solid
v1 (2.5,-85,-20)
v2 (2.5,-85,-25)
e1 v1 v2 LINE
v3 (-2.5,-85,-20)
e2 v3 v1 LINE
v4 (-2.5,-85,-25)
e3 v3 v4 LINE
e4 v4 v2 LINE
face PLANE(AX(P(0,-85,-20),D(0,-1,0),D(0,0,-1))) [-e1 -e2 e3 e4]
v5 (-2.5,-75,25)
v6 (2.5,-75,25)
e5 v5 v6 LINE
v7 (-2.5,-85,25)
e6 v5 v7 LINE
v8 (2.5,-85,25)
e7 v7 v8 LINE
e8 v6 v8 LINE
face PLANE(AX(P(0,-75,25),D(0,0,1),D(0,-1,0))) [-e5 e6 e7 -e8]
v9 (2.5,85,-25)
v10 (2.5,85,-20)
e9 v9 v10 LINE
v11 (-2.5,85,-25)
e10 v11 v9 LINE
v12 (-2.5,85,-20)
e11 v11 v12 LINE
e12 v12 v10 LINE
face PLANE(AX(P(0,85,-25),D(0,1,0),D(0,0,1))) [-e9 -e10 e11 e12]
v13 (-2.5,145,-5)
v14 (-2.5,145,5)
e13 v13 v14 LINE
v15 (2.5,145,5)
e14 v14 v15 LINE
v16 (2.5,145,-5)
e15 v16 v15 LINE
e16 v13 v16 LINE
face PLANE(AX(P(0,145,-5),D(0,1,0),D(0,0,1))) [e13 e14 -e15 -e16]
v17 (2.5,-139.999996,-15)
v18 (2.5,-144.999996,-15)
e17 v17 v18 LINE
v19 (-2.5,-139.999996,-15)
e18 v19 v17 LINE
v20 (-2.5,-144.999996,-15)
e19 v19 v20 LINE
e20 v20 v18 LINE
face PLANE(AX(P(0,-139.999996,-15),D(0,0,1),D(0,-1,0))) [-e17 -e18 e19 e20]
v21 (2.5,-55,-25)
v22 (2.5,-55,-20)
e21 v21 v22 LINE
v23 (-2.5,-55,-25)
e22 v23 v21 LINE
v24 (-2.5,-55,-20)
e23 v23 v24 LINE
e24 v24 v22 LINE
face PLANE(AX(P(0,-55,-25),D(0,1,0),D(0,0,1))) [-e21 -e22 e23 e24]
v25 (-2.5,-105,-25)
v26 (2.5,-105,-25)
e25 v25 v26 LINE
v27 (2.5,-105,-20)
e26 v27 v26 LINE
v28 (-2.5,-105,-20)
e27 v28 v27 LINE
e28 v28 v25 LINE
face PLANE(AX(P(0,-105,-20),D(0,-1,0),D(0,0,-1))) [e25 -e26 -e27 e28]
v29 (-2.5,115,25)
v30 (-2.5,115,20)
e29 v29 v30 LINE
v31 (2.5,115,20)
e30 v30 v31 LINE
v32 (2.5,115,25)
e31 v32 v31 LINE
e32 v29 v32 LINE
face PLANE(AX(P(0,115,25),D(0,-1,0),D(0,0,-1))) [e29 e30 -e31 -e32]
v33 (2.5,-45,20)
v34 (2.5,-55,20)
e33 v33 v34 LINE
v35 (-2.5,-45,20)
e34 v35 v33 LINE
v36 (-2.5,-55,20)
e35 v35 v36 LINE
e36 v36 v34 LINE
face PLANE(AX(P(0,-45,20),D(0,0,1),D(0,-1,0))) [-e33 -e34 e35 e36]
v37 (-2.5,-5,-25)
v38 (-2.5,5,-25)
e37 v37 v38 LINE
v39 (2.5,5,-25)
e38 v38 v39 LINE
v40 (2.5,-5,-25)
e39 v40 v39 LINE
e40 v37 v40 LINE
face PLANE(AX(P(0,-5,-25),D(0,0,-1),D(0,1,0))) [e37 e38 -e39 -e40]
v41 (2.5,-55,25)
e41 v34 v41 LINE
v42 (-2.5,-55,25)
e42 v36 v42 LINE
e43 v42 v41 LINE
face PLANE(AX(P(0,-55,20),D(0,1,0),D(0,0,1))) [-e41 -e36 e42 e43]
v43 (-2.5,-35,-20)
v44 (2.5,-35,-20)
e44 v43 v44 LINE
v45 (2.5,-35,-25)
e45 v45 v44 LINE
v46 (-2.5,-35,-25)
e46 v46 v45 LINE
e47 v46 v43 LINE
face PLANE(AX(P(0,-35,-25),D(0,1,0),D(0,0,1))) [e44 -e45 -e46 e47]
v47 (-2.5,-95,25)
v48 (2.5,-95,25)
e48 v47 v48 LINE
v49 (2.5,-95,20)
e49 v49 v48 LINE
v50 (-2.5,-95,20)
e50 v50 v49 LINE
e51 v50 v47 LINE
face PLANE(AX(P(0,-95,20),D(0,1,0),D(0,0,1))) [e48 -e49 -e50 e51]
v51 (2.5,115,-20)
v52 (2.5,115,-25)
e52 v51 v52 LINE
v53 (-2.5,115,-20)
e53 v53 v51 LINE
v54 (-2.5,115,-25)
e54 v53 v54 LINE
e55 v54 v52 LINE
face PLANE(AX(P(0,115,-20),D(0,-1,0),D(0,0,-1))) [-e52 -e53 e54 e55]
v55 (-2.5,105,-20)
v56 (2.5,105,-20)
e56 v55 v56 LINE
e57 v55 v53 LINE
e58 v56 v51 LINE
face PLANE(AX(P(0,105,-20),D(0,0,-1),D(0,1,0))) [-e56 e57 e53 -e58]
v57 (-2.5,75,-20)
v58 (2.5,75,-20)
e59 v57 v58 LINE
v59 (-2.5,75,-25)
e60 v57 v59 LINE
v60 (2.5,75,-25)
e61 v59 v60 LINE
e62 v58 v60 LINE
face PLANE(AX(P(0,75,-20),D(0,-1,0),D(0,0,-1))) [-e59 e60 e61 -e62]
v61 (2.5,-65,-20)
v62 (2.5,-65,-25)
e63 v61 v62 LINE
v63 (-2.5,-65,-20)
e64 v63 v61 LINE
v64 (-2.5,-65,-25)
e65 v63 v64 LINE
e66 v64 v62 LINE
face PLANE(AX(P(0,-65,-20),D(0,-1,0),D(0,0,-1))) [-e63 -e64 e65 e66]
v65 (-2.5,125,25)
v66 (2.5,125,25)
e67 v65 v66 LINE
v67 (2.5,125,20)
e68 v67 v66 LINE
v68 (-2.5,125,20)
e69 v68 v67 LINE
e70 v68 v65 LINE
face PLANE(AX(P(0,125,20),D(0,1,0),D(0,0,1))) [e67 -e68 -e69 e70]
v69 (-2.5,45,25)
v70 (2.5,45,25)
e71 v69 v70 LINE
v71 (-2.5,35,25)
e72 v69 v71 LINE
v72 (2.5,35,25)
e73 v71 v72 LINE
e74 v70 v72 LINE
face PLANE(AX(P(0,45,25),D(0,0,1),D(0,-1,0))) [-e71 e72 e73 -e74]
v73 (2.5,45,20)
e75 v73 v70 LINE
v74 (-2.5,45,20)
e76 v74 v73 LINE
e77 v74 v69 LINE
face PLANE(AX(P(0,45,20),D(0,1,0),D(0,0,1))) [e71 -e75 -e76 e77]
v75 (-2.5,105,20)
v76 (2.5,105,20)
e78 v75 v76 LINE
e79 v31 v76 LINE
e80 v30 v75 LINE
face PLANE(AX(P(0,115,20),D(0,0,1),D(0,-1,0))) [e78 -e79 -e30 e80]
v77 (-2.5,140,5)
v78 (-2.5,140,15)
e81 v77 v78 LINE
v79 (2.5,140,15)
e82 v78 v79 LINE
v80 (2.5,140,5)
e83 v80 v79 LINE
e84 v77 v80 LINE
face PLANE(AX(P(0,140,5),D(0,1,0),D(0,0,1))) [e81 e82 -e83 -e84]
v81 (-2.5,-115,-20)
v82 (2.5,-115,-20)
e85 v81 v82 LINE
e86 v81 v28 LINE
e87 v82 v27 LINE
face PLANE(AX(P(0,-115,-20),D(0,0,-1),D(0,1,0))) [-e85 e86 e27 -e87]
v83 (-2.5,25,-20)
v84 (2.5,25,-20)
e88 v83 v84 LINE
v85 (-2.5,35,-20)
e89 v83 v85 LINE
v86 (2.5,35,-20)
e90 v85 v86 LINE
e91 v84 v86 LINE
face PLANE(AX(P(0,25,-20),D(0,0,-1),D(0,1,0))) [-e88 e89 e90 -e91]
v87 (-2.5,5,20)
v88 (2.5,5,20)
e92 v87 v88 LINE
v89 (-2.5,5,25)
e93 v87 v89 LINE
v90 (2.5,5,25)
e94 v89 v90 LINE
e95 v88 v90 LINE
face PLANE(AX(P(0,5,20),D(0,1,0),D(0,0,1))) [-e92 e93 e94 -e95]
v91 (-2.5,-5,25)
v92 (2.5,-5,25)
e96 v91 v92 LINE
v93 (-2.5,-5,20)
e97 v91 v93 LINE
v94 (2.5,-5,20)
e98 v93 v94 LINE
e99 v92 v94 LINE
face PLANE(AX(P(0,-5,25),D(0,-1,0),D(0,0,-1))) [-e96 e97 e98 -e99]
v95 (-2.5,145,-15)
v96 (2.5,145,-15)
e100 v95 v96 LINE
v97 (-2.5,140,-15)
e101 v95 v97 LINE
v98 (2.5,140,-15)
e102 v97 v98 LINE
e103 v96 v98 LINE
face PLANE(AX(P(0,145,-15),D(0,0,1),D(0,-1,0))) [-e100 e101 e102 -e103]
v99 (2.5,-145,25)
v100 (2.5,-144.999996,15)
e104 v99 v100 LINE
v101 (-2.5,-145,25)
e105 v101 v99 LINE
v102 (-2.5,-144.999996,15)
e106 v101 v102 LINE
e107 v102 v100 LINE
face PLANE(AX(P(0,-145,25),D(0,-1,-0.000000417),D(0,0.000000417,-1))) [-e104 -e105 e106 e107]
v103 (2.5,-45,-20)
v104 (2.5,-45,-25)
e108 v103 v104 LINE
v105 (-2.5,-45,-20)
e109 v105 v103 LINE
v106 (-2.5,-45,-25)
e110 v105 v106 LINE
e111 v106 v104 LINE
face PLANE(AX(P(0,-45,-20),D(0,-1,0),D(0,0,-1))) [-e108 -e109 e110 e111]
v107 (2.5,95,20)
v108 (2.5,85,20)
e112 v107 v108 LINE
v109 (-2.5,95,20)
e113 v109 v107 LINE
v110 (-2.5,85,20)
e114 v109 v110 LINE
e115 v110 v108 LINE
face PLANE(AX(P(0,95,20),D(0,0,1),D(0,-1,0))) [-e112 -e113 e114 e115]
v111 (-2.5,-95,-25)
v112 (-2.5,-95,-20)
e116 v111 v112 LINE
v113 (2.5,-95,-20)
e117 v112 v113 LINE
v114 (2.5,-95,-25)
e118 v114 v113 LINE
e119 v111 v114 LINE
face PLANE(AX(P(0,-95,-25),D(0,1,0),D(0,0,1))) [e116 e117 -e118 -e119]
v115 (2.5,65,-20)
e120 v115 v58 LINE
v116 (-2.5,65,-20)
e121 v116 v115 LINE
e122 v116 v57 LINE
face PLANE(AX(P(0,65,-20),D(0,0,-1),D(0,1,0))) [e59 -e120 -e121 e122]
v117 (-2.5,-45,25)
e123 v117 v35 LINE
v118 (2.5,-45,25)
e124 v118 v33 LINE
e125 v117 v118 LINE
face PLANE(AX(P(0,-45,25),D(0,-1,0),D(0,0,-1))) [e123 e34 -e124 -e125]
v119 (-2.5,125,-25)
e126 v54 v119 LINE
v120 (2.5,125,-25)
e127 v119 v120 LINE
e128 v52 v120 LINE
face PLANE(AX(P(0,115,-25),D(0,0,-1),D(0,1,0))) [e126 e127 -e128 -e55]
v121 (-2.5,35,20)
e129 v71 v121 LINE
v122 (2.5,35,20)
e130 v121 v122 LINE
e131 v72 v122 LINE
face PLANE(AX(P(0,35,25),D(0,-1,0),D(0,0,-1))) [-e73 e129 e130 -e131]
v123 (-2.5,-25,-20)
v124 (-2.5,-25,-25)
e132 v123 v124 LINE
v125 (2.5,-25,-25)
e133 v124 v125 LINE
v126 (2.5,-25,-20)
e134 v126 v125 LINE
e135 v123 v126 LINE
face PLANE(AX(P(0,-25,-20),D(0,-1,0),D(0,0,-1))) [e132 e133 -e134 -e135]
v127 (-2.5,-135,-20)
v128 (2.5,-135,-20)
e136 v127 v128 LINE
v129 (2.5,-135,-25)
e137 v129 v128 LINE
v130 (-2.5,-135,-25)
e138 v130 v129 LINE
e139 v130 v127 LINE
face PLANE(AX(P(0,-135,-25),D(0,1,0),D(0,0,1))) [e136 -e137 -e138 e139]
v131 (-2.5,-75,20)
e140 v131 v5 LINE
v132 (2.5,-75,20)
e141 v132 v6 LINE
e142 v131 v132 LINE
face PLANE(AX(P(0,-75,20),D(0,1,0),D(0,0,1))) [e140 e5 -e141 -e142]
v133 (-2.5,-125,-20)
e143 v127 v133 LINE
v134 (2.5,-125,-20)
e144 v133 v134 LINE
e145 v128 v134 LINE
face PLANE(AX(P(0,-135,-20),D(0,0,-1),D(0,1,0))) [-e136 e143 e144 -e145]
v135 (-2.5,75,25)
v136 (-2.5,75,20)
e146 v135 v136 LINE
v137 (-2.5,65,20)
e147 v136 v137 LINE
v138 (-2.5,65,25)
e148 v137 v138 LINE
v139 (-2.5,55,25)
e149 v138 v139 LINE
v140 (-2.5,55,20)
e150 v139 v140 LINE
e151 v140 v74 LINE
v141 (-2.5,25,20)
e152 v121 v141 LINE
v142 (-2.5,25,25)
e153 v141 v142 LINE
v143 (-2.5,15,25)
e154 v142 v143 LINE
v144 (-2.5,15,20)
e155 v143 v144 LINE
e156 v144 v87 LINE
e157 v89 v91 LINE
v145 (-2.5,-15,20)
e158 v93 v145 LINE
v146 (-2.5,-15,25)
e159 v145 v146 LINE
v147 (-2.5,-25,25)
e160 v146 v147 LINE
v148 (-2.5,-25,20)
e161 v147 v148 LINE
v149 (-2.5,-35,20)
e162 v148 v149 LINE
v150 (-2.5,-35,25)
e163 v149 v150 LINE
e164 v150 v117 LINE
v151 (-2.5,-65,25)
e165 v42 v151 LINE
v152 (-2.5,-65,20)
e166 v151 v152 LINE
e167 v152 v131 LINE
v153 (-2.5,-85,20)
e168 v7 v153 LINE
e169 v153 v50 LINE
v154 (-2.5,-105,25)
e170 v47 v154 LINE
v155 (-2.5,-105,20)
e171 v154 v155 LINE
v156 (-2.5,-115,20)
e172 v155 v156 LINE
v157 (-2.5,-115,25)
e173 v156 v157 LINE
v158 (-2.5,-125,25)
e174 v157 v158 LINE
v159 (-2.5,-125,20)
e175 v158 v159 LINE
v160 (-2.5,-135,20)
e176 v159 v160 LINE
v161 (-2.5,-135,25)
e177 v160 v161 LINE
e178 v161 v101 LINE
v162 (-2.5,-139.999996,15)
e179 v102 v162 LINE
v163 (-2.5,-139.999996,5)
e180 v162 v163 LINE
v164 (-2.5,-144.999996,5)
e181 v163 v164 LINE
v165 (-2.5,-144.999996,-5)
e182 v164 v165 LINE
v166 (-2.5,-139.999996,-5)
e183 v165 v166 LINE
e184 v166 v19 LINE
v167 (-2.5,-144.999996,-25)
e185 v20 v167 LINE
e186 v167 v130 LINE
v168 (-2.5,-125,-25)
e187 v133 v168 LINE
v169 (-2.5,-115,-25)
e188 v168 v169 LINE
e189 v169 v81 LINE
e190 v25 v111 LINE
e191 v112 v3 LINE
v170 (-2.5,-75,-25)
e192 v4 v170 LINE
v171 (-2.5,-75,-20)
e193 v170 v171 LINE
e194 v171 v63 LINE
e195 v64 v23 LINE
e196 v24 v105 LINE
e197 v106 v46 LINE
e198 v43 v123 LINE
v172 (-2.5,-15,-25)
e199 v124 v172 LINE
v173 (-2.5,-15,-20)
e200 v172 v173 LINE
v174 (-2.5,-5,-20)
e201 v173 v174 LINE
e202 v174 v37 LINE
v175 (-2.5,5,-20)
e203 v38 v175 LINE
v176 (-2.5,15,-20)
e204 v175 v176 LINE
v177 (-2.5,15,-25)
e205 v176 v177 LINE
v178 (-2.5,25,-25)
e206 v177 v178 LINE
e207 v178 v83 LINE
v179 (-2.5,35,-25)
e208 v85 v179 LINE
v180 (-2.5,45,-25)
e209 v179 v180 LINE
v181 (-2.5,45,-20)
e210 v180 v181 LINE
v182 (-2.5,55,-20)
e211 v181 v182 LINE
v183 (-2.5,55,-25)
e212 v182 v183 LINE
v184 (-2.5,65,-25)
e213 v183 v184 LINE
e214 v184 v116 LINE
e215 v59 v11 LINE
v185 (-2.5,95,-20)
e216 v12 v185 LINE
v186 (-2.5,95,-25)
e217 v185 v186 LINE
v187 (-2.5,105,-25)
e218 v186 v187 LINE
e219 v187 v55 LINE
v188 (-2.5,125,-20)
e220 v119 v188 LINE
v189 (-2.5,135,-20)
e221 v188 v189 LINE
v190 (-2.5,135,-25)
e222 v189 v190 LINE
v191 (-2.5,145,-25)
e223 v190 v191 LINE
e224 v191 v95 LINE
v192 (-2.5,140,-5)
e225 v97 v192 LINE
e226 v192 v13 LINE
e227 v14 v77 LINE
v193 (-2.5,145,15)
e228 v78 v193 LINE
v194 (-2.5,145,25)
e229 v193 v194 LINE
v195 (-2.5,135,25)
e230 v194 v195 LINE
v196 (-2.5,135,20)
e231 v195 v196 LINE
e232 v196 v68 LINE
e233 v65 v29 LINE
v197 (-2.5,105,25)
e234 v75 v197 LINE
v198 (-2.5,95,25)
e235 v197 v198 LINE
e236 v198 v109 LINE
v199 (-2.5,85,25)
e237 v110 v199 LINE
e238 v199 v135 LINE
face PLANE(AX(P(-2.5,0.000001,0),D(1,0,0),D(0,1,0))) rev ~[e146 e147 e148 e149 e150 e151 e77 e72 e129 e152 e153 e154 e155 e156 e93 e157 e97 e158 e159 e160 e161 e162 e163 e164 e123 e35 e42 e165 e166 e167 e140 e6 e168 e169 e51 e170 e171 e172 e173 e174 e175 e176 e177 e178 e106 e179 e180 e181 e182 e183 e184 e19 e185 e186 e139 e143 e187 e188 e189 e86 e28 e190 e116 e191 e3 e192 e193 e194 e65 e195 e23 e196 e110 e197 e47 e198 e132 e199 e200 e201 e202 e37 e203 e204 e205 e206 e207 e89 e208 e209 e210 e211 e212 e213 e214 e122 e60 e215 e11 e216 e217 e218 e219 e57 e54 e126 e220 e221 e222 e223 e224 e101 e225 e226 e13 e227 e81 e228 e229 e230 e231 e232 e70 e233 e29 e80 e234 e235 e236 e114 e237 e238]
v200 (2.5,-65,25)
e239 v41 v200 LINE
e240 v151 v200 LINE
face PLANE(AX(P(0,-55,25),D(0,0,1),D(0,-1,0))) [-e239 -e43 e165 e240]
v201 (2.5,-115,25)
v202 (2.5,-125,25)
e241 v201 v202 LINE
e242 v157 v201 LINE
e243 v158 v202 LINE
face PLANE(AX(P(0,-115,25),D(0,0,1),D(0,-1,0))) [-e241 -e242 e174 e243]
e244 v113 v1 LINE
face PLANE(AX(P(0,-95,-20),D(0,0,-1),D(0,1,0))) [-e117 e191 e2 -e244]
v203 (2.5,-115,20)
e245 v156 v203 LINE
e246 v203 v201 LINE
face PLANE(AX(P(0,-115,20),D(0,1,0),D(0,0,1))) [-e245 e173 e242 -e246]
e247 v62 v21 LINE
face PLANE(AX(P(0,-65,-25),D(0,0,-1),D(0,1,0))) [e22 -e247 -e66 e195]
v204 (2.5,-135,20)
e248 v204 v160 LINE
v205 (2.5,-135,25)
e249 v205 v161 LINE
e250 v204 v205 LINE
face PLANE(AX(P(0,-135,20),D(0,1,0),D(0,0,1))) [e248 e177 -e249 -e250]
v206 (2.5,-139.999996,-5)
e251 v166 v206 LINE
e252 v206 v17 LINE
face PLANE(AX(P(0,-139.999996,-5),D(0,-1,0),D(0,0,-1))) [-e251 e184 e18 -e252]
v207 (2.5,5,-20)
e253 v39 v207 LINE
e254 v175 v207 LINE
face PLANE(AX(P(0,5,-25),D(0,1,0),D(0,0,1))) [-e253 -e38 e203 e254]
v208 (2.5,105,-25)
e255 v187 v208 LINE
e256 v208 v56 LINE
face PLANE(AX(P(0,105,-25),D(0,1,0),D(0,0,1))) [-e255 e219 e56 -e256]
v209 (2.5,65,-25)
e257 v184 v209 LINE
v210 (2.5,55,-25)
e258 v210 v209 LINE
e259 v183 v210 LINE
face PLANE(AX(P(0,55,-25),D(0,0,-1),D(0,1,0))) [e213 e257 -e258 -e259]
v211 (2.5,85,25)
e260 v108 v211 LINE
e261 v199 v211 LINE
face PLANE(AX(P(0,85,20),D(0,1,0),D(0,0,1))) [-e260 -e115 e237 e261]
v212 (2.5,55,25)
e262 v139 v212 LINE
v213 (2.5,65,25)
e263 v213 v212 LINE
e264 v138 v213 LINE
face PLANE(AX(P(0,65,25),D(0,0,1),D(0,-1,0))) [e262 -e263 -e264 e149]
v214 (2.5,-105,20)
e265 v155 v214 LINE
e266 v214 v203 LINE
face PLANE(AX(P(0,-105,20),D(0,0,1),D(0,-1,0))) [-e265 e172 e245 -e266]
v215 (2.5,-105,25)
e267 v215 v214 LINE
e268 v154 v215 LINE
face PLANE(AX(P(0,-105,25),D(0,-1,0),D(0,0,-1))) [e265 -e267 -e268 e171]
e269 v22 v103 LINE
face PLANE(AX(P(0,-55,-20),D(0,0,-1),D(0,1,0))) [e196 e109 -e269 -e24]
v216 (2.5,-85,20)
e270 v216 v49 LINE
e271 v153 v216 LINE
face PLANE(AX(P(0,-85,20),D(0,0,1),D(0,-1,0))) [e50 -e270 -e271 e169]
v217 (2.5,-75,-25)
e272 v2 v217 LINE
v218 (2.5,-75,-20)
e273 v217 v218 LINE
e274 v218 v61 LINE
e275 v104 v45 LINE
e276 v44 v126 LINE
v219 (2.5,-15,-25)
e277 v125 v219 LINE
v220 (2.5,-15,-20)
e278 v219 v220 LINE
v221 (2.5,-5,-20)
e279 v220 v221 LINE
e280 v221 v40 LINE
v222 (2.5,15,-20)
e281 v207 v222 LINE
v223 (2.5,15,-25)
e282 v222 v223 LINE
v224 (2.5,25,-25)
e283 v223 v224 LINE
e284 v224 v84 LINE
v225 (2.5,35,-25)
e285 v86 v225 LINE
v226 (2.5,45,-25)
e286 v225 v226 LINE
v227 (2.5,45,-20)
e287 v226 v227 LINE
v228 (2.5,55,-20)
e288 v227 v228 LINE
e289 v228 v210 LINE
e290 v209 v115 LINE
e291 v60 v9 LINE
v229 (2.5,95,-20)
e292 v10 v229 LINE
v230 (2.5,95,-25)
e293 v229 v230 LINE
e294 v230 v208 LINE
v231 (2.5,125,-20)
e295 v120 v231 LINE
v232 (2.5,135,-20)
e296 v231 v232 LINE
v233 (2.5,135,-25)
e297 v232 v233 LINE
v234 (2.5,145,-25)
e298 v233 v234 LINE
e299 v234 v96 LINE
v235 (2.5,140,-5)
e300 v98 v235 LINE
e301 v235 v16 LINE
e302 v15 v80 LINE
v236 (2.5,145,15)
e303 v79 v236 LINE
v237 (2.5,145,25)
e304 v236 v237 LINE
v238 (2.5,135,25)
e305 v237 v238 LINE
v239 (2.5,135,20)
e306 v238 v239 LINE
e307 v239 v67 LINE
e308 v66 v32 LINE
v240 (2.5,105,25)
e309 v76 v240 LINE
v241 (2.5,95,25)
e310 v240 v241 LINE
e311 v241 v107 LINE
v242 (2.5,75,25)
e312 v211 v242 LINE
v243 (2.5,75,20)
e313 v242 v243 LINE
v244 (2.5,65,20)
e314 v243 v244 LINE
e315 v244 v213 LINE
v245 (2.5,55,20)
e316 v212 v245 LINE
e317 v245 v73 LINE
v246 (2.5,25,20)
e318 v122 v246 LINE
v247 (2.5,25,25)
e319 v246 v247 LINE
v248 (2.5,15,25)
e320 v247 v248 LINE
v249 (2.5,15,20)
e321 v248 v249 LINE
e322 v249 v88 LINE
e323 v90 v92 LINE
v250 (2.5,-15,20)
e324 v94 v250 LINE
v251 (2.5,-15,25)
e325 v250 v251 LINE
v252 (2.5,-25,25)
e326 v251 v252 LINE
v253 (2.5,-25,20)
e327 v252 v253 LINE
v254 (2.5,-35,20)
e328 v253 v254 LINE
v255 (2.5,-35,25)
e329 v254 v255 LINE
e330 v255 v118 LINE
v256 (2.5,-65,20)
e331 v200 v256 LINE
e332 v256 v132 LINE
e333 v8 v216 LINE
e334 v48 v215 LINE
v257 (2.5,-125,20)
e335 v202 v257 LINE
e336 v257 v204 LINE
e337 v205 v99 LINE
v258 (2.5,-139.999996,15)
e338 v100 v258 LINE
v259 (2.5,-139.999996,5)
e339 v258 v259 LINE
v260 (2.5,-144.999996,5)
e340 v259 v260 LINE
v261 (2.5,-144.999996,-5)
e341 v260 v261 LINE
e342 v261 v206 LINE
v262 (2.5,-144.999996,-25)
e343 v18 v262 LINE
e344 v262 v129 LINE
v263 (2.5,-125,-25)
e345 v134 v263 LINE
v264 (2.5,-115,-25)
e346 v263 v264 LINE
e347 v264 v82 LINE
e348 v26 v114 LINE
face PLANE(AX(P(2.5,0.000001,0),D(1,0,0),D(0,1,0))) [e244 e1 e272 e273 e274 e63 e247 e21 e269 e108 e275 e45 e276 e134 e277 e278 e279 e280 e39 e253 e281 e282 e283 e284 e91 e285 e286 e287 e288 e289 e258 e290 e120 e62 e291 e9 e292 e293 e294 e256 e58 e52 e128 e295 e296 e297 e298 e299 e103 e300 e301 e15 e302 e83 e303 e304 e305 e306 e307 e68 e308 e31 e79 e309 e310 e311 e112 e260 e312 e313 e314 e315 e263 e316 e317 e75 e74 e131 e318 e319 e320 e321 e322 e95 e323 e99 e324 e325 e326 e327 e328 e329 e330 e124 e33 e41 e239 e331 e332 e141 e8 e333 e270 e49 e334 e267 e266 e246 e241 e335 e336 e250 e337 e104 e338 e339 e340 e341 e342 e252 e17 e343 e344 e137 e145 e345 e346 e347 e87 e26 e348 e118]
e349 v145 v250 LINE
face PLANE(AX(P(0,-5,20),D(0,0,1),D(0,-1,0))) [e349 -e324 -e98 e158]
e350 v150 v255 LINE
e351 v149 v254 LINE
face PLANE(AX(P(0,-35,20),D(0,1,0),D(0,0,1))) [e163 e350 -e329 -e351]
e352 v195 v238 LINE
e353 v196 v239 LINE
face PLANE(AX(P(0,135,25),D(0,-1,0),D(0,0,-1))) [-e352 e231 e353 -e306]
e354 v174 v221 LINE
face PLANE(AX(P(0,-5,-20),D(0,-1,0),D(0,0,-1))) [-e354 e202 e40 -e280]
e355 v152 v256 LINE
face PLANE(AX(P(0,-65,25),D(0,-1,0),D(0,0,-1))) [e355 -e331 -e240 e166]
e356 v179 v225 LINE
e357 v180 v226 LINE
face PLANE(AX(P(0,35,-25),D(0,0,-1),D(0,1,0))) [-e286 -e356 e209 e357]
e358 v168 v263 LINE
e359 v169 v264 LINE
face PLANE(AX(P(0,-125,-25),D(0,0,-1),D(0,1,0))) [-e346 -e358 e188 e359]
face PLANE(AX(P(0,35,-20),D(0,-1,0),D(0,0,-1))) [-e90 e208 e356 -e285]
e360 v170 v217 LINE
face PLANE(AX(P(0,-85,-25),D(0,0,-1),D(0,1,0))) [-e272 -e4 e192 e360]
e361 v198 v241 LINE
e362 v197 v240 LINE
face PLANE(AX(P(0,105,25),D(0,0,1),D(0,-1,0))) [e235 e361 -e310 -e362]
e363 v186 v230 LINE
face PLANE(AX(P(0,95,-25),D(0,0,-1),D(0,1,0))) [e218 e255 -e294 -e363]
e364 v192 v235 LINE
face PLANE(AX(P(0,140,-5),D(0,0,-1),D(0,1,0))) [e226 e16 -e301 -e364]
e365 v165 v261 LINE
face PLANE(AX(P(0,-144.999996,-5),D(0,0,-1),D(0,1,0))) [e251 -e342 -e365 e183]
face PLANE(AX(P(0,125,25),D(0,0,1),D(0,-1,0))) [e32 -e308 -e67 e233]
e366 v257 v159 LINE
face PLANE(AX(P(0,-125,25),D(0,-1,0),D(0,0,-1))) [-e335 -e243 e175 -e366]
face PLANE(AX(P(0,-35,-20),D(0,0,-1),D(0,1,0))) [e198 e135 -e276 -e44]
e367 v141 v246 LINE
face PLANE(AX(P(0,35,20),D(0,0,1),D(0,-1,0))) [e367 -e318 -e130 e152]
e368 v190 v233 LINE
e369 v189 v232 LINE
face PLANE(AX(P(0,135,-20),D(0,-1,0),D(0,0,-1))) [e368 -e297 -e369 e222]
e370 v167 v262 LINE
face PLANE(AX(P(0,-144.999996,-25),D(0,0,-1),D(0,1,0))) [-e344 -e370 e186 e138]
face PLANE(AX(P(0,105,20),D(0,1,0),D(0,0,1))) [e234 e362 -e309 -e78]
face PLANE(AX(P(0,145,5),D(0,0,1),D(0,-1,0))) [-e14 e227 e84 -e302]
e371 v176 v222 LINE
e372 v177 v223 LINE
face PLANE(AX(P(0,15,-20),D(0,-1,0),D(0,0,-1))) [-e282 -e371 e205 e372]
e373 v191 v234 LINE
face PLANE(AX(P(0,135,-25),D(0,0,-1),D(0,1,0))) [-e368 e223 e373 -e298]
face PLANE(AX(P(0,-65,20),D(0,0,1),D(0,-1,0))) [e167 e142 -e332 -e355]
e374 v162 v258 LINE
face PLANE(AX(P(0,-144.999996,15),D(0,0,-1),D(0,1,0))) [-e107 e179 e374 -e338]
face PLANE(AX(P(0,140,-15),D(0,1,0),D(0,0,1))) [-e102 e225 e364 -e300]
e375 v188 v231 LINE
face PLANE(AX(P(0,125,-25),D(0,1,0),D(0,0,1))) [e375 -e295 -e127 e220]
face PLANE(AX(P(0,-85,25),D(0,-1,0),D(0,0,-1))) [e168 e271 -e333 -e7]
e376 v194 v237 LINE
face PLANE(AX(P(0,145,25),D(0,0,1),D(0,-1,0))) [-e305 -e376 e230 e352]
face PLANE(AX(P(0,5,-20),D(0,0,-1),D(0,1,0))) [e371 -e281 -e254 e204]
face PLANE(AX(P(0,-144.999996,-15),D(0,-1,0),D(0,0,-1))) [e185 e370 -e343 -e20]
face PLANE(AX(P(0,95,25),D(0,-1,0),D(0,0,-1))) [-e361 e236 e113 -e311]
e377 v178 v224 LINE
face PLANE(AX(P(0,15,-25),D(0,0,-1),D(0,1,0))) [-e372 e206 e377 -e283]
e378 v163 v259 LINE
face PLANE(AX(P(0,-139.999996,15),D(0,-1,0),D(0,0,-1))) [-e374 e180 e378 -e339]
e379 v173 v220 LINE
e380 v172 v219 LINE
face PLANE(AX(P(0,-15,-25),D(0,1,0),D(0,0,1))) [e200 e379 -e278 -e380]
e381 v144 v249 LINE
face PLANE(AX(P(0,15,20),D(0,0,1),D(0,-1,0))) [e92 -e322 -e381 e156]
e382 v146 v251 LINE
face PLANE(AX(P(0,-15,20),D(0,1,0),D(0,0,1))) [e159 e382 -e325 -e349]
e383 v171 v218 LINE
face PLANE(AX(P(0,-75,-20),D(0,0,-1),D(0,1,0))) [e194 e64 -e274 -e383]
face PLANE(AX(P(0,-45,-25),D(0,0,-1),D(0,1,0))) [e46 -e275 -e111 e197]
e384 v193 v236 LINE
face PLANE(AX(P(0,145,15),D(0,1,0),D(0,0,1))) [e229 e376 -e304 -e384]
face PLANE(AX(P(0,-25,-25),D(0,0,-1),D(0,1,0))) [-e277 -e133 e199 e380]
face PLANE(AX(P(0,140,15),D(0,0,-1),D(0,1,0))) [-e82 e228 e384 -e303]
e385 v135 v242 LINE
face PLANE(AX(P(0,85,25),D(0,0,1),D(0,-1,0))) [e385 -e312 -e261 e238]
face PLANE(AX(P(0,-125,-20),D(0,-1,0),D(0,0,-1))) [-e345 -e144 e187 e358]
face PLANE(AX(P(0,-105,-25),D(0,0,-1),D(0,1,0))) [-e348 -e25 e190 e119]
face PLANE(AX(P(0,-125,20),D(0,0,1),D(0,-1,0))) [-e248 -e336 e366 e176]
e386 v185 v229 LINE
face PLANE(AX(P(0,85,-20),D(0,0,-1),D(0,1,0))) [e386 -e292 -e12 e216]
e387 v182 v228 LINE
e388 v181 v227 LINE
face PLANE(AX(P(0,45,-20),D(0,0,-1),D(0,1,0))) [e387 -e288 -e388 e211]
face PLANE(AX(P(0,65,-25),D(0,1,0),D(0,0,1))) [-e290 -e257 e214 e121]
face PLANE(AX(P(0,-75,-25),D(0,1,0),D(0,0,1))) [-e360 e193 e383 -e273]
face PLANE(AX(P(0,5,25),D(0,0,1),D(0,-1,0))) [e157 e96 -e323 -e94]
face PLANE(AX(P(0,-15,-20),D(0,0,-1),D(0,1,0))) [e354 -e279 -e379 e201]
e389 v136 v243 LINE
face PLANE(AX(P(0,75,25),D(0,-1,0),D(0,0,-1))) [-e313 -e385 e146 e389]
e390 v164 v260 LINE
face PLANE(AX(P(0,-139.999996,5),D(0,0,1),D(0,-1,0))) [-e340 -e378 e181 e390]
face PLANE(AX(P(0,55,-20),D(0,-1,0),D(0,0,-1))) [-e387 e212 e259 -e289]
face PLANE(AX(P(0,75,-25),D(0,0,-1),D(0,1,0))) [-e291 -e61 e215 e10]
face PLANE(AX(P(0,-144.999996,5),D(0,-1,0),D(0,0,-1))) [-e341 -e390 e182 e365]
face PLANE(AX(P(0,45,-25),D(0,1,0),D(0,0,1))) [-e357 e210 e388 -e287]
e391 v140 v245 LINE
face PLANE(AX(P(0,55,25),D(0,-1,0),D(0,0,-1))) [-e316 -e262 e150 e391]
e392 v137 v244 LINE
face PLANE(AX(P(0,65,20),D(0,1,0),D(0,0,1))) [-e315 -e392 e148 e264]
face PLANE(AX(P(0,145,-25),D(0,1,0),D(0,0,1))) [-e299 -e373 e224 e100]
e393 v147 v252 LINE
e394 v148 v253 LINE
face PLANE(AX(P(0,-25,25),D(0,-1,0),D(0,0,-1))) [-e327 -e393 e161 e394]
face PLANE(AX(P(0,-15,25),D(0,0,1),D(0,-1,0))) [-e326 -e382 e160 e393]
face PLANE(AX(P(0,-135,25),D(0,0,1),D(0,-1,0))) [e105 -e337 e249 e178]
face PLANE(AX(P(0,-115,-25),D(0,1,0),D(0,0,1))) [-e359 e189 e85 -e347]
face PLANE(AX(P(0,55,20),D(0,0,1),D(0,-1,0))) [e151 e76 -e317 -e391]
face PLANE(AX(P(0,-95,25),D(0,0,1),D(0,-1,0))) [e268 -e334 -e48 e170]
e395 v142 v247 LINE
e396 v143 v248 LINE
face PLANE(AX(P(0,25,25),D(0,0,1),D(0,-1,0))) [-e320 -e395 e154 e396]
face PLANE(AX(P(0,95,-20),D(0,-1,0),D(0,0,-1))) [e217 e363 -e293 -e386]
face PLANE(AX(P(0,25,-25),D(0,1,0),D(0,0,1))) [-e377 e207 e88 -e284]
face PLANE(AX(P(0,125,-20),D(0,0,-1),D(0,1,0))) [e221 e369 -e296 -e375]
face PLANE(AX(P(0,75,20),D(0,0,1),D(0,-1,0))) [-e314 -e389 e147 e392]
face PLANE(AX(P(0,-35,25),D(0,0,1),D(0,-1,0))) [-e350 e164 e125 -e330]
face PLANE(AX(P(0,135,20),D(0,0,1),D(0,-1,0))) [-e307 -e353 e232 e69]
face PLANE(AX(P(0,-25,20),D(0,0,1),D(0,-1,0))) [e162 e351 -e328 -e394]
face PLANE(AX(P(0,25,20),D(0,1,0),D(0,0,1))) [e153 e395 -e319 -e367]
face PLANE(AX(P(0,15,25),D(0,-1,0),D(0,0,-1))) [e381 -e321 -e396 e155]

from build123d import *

# Parameters (mm, degrees)
F1_DEPTH = 2.5


# Not quite as in the source:
# - ends of sketch curves that miss each other by under 0.0002 mm in the source are joined


with BuildPart() as f1:
    # F0 (on Right) → F1 (new body, symmetric)
    with BuildSketch(Plane.YZ):
        Polygon((-135, 25), (-145, 25), (-144.9999958277, 15), (-139.9999958277, 15), (-139.9999958277, 5), (-144.9999958277, 5), (-144.9999958277, -5), (-139.9999958277, -5), (-139.9999958277, -15), (-144.9999958277, -15), (-144.9999958277, -25), (-135, -25), (-135, -20), (-125, -20), (-125, -25), (-115, -25), (-115, -20), (-105, -20), (-105, -25), (-95, -25), (-95, -20), (-85, -20), (-85, -25), (-75, -25), (-75, -20), (-65, -20), (-65, -25), (-55, -25), (-55, -20), (-45, -20), (-45, -25), (-35, -25), (-35, -20), (-25, -20), (-25, -25), (-15, -25), (-15, -20), (-5, -20), (-5, -25), (5, -25), (5, -20), (15, -20), (15, -25), (25, -25), (25, -20), (35, -20), (35, -25), (45, -25), (45, -20), (55, -20), (55, -25), (65, -25), (65, -20), (75, -20), (75, -25), (85, -25), (85, -20), (95, -20), (95, -25), (105, -25), (105, -20), (115, -20), (115, -25), (125, -25), (125, -20), (135, -20), (135, -25), (145, -25), (145, -15), (140, -15), (140, -5), (145, -5), (145, 5), (140, 5), (140, 15), (145, 15), (145, 25), (135, 25), (135, 20), (125, 20), (125, 25), (115, 25), (115, 20), (105, 20), (105, 25), (95, 25), (95, 20), (85, 20), (85, 25), (75, 25), (75, 20), (65, 20), (65, 25), (55, 25), (55, 20), (45, 20), (45, 25), (35, 25), (35, 20), (25, 20), (25, 25), (15, 25), (15, 20), (5, 20), (5, 25), (-5, 25), (-5, 20), (-15, 20), (-15, 25), (-25, 25), (-25, 20), (-35, 20), (-35, 25), (-45, 25), (-45, 20), (-55, 20), (-55, 25), (-65, 25), (-65, 20), (-75, 20), (-75, 25), (-85, 25), (-85, 20), (-95, 20), (-95, 25), (-105, 25), (-105, 20), (-115, 20), (-115, 25), (-125, 25), (-125, 20), (-135, 20), align=None)
    extrude(amount=F1_DEPTH, both=True)


solid = f1.part
